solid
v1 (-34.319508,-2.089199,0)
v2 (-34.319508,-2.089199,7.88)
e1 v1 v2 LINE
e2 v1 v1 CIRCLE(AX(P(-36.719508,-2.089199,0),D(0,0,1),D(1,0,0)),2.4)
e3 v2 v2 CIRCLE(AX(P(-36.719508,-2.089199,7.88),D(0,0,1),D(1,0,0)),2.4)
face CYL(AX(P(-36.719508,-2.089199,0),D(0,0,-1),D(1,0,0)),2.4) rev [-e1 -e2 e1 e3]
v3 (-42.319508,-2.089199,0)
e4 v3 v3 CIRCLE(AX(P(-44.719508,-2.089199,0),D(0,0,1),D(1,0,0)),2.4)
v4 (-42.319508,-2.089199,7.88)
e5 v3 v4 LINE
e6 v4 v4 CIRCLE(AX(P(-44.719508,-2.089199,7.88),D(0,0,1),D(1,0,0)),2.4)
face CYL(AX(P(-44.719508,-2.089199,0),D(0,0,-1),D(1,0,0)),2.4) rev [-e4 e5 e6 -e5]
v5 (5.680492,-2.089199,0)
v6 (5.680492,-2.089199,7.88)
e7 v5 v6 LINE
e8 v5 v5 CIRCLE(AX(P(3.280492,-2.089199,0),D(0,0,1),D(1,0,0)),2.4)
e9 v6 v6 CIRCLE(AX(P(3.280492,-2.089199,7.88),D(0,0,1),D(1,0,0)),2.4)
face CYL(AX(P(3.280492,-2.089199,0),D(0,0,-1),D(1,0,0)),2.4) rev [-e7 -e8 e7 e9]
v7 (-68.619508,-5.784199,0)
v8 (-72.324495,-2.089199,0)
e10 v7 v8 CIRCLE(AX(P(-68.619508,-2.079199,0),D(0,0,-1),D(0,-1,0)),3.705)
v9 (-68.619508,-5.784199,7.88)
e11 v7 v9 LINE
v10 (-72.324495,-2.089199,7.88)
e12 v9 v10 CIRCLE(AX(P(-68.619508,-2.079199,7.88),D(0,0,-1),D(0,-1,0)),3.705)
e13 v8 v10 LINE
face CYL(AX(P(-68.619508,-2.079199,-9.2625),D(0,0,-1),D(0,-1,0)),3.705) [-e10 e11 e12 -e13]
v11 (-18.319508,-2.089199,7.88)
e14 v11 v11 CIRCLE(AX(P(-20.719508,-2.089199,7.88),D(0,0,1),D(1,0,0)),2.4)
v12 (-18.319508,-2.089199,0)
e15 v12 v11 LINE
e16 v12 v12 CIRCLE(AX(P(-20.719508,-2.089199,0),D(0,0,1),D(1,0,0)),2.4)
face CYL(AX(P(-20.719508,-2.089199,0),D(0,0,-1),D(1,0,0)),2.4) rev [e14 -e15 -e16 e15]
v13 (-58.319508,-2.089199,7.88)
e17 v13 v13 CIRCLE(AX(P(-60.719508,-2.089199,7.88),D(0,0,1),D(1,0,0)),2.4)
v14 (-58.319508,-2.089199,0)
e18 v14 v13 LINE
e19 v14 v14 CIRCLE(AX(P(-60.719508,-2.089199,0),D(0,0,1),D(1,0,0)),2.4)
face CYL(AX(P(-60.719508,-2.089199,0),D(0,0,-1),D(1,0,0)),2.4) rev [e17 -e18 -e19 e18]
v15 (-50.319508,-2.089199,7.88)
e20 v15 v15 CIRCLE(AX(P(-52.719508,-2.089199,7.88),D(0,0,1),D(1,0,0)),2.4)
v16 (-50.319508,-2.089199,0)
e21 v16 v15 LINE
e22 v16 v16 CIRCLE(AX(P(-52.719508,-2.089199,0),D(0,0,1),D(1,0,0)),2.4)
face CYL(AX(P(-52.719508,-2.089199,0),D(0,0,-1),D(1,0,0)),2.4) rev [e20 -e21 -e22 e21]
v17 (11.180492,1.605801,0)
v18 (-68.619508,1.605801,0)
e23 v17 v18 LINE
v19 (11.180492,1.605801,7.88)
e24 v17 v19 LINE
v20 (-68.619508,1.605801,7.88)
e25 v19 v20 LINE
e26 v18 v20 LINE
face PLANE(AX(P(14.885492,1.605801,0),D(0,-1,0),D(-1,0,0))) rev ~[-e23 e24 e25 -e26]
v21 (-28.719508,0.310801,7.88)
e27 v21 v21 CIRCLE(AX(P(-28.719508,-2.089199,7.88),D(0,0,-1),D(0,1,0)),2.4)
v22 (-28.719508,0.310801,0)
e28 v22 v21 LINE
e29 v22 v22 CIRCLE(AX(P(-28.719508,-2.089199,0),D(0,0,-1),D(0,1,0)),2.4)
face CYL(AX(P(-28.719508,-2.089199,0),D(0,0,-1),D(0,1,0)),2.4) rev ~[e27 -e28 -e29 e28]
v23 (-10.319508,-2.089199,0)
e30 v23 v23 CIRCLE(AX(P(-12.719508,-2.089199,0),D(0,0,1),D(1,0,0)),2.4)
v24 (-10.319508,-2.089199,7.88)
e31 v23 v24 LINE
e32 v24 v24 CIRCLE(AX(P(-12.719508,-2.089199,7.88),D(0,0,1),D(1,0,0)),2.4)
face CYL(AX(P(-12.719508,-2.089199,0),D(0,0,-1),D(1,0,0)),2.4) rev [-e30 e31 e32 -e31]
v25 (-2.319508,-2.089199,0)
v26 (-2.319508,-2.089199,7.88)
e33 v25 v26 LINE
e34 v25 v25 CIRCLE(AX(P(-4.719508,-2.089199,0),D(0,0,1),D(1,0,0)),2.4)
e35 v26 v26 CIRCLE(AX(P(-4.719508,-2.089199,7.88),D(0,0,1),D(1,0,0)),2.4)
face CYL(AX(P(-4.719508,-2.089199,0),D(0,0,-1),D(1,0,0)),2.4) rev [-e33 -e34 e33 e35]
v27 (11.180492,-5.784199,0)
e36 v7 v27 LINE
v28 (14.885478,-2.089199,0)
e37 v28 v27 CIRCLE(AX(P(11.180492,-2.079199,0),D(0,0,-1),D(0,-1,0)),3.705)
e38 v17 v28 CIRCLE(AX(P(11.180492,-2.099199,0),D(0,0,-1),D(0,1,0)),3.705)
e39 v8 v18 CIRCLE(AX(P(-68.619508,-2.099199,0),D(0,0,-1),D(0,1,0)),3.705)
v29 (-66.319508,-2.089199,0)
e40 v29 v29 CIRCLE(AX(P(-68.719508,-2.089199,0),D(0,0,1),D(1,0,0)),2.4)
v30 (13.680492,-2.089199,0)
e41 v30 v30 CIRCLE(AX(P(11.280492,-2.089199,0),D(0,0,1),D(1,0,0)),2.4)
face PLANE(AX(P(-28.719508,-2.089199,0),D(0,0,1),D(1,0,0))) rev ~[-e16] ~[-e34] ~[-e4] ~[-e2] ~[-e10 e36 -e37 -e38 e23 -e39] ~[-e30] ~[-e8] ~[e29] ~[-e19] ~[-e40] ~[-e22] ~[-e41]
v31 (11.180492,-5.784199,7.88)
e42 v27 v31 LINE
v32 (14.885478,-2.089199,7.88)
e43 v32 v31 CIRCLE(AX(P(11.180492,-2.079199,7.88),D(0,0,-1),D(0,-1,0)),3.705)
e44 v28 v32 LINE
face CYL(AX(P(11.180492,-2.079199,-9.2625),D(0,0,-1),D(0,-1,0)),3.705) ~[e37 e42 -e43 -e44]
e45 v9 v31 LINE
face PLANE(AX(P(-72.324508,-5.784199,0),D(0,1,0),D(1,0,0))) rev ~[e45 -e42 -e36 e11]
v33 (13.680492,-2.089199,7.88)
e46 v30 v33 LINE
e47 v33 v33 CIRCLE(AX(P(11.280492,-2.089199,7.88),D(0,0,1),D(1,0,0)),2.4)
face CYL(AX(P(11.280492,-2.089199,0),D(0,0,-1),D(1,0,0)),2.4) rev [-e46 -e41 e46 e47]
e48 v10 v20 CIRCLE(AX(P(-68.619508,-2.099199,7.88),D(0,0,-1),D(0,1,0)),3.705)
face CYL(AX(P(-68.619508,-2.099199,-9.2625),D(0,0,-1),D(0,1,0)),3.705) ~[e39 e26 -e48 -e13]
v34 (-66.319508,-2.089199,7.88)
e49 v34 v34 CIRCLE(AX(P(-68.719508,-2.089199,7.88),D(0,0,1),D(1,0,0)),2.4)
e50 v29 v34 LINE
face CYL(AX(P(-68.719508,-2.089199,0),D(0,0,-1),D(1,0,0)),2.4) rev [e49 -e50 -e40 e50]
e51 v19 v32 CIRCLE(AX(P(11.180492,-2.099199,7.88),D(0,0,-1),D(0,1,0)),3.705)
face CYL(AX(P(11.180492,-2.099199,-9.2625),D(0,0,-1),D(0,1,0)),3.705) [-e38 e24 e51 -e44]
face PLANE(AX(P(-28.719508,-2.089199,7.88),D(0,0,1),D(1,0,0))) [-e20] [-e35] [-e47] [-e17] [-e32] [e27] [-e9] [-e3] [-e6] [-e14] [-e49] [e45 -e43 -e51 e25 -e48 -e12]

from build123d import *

# Parameters (mm, degrees)
F0_R        = 2.4
F1_DEPTH    = 7.88
F2_T1_DEPTH = 26.405


# Not quite as in the source:
# - a fillet or chamfer that OpenCascade refuses, or shapes differently, is made with other operations: its cross-section is extruded or revolved along the edge and cut away or added


with BuildPart() as f1:
    # F0 (on Top) → F1 (new body)
    with BuildSketch(Plane.XY):
        Polygon((14.8854916829, 1.6058013724), (-28.7195083171, 1.6058013724), (-72.3245083171, 1.6058013724), (-72.3245083171, -2.0891986276), (-72.3245083171, -5.7841986276), (-28.7195083171, -5.7841986276), (14.8854916829, -5.7841986276), (14.8854916829, -2.0891986276), align=None)
        with Locations((-68.7195083171, -2.0891986276)):
            Circle(F0_R, mode=Mode.SUBTRACT)
        with Locations((-60.7195083171, -2.0891986276)):
            Circle(F0_R, mode=Mode.SUBTRACT)
        with Locations((-52.7195083171, -2.0891986276)):
            Circle(F0_R, mode=Mode.SUBTRACT)
        with Locations((-44.7195083171, -2.0891986276)):
            Circle(F0_R, mode=Mode.SUBTRACT)
        with Locations((-36.7195083171, -2.0891986276)):
            Circle(F0_R, mode=Mode.SUBTRACT)
        with BuildLine():
            ThreePointArc((-28.7195083171, -4.4891986276), (-31.1195083171, -2.0891986276), (-28.7195083171, 0.3108013724))
            ThreePointArc((-28.7195083171, 0.3108013724), (-26.3195083171, -2.0891986276), (-28.7195083171, -4.4891986276))
        make_face(mode=Mode.SUBTRACT)
        with Locations((-20.7195083171, -2.0891986276)):
            Circle(F0_R, mode=Mode.SUBTRACT)
        with Locations((-12.7195083171, -2.0891986276)):
            Circle(F0_R, mode=Mode.SUBTRACT)
        with Locations((-4.7195083171, -2.0891986276)):
            Circle(F0_R, mode=Mode.SUBTRACT)
        with Locations((3.2804916829, -2.0891986276)):
            Circle(F0_R, mode=Mode.SUBTRACT)
        with Locations((11.2804916829, -2.0891986276)):
            Circle(F0_R, mode=Mode.SUBTRACT)
    extrude(amount=F1_DEPTH)

    # F2: fillet of radius 3.705 on 4 edges, made by hand

    # F2_s2 → F2_t1 (cut)
    with BuildSketch(Plane.XY.offset(-9.2625)):
        with BuildLine():
            ThreePointArc((11.1804916829, 1.6058013724), (13.8003223072, 0.5206319967), (14.8854916829, -2.0991986276))
            Line((14.8854916829, -2.0991986276), (14.8854916829, 1.6058013724))
            Line((14.8854916829, 1.6058013724), (11.1804916829, 1.6058013724))
        make_face()
        with BuildLine():
            ThreePointArc((11.1804916829, -5.7841986276), (13.8003223072, -4.6990292519), (14.8854916829, -2.0791986276))
            Line((14.8854916829, -2.0791986276), (14.8854916829, -5.7841986276))
            Line((14.8854916829, -5.7841986276), (11.1804916829, -5.7841986276))
        make_face()
        with BuildLine():
            ThreePointArc((-68.6195083171, 1.6058013724), (-71.2393389413, 0.5206319967), (-72.3245083171, -2.0991986276))
            Line((-72.3245083171, -2.0991986276), (-72.3245083171, 1.6058013724))
            Line((-72.3245083171, 1.6058013724), (-68.6195083171, 1.6058013724))
        make_face()
        with BuildLine():
            ThreePointArc((-68.6195083171, -5.7841986276), (-71.2393389413, -4.6990292519), (-72.3245083171, -2.0791986276))
            Line((-72.3245083171, -2.0791986276), (-72.3245083171, -5.7841986276))
            Line((-72.3245083171, -5.7841986276), (-68.6195083171, -5.7841986276))
        make_face()
    extrude(amount=F2_T1_DEPTH, mode=Mode.SUBTRACT)


solid = f1.part
